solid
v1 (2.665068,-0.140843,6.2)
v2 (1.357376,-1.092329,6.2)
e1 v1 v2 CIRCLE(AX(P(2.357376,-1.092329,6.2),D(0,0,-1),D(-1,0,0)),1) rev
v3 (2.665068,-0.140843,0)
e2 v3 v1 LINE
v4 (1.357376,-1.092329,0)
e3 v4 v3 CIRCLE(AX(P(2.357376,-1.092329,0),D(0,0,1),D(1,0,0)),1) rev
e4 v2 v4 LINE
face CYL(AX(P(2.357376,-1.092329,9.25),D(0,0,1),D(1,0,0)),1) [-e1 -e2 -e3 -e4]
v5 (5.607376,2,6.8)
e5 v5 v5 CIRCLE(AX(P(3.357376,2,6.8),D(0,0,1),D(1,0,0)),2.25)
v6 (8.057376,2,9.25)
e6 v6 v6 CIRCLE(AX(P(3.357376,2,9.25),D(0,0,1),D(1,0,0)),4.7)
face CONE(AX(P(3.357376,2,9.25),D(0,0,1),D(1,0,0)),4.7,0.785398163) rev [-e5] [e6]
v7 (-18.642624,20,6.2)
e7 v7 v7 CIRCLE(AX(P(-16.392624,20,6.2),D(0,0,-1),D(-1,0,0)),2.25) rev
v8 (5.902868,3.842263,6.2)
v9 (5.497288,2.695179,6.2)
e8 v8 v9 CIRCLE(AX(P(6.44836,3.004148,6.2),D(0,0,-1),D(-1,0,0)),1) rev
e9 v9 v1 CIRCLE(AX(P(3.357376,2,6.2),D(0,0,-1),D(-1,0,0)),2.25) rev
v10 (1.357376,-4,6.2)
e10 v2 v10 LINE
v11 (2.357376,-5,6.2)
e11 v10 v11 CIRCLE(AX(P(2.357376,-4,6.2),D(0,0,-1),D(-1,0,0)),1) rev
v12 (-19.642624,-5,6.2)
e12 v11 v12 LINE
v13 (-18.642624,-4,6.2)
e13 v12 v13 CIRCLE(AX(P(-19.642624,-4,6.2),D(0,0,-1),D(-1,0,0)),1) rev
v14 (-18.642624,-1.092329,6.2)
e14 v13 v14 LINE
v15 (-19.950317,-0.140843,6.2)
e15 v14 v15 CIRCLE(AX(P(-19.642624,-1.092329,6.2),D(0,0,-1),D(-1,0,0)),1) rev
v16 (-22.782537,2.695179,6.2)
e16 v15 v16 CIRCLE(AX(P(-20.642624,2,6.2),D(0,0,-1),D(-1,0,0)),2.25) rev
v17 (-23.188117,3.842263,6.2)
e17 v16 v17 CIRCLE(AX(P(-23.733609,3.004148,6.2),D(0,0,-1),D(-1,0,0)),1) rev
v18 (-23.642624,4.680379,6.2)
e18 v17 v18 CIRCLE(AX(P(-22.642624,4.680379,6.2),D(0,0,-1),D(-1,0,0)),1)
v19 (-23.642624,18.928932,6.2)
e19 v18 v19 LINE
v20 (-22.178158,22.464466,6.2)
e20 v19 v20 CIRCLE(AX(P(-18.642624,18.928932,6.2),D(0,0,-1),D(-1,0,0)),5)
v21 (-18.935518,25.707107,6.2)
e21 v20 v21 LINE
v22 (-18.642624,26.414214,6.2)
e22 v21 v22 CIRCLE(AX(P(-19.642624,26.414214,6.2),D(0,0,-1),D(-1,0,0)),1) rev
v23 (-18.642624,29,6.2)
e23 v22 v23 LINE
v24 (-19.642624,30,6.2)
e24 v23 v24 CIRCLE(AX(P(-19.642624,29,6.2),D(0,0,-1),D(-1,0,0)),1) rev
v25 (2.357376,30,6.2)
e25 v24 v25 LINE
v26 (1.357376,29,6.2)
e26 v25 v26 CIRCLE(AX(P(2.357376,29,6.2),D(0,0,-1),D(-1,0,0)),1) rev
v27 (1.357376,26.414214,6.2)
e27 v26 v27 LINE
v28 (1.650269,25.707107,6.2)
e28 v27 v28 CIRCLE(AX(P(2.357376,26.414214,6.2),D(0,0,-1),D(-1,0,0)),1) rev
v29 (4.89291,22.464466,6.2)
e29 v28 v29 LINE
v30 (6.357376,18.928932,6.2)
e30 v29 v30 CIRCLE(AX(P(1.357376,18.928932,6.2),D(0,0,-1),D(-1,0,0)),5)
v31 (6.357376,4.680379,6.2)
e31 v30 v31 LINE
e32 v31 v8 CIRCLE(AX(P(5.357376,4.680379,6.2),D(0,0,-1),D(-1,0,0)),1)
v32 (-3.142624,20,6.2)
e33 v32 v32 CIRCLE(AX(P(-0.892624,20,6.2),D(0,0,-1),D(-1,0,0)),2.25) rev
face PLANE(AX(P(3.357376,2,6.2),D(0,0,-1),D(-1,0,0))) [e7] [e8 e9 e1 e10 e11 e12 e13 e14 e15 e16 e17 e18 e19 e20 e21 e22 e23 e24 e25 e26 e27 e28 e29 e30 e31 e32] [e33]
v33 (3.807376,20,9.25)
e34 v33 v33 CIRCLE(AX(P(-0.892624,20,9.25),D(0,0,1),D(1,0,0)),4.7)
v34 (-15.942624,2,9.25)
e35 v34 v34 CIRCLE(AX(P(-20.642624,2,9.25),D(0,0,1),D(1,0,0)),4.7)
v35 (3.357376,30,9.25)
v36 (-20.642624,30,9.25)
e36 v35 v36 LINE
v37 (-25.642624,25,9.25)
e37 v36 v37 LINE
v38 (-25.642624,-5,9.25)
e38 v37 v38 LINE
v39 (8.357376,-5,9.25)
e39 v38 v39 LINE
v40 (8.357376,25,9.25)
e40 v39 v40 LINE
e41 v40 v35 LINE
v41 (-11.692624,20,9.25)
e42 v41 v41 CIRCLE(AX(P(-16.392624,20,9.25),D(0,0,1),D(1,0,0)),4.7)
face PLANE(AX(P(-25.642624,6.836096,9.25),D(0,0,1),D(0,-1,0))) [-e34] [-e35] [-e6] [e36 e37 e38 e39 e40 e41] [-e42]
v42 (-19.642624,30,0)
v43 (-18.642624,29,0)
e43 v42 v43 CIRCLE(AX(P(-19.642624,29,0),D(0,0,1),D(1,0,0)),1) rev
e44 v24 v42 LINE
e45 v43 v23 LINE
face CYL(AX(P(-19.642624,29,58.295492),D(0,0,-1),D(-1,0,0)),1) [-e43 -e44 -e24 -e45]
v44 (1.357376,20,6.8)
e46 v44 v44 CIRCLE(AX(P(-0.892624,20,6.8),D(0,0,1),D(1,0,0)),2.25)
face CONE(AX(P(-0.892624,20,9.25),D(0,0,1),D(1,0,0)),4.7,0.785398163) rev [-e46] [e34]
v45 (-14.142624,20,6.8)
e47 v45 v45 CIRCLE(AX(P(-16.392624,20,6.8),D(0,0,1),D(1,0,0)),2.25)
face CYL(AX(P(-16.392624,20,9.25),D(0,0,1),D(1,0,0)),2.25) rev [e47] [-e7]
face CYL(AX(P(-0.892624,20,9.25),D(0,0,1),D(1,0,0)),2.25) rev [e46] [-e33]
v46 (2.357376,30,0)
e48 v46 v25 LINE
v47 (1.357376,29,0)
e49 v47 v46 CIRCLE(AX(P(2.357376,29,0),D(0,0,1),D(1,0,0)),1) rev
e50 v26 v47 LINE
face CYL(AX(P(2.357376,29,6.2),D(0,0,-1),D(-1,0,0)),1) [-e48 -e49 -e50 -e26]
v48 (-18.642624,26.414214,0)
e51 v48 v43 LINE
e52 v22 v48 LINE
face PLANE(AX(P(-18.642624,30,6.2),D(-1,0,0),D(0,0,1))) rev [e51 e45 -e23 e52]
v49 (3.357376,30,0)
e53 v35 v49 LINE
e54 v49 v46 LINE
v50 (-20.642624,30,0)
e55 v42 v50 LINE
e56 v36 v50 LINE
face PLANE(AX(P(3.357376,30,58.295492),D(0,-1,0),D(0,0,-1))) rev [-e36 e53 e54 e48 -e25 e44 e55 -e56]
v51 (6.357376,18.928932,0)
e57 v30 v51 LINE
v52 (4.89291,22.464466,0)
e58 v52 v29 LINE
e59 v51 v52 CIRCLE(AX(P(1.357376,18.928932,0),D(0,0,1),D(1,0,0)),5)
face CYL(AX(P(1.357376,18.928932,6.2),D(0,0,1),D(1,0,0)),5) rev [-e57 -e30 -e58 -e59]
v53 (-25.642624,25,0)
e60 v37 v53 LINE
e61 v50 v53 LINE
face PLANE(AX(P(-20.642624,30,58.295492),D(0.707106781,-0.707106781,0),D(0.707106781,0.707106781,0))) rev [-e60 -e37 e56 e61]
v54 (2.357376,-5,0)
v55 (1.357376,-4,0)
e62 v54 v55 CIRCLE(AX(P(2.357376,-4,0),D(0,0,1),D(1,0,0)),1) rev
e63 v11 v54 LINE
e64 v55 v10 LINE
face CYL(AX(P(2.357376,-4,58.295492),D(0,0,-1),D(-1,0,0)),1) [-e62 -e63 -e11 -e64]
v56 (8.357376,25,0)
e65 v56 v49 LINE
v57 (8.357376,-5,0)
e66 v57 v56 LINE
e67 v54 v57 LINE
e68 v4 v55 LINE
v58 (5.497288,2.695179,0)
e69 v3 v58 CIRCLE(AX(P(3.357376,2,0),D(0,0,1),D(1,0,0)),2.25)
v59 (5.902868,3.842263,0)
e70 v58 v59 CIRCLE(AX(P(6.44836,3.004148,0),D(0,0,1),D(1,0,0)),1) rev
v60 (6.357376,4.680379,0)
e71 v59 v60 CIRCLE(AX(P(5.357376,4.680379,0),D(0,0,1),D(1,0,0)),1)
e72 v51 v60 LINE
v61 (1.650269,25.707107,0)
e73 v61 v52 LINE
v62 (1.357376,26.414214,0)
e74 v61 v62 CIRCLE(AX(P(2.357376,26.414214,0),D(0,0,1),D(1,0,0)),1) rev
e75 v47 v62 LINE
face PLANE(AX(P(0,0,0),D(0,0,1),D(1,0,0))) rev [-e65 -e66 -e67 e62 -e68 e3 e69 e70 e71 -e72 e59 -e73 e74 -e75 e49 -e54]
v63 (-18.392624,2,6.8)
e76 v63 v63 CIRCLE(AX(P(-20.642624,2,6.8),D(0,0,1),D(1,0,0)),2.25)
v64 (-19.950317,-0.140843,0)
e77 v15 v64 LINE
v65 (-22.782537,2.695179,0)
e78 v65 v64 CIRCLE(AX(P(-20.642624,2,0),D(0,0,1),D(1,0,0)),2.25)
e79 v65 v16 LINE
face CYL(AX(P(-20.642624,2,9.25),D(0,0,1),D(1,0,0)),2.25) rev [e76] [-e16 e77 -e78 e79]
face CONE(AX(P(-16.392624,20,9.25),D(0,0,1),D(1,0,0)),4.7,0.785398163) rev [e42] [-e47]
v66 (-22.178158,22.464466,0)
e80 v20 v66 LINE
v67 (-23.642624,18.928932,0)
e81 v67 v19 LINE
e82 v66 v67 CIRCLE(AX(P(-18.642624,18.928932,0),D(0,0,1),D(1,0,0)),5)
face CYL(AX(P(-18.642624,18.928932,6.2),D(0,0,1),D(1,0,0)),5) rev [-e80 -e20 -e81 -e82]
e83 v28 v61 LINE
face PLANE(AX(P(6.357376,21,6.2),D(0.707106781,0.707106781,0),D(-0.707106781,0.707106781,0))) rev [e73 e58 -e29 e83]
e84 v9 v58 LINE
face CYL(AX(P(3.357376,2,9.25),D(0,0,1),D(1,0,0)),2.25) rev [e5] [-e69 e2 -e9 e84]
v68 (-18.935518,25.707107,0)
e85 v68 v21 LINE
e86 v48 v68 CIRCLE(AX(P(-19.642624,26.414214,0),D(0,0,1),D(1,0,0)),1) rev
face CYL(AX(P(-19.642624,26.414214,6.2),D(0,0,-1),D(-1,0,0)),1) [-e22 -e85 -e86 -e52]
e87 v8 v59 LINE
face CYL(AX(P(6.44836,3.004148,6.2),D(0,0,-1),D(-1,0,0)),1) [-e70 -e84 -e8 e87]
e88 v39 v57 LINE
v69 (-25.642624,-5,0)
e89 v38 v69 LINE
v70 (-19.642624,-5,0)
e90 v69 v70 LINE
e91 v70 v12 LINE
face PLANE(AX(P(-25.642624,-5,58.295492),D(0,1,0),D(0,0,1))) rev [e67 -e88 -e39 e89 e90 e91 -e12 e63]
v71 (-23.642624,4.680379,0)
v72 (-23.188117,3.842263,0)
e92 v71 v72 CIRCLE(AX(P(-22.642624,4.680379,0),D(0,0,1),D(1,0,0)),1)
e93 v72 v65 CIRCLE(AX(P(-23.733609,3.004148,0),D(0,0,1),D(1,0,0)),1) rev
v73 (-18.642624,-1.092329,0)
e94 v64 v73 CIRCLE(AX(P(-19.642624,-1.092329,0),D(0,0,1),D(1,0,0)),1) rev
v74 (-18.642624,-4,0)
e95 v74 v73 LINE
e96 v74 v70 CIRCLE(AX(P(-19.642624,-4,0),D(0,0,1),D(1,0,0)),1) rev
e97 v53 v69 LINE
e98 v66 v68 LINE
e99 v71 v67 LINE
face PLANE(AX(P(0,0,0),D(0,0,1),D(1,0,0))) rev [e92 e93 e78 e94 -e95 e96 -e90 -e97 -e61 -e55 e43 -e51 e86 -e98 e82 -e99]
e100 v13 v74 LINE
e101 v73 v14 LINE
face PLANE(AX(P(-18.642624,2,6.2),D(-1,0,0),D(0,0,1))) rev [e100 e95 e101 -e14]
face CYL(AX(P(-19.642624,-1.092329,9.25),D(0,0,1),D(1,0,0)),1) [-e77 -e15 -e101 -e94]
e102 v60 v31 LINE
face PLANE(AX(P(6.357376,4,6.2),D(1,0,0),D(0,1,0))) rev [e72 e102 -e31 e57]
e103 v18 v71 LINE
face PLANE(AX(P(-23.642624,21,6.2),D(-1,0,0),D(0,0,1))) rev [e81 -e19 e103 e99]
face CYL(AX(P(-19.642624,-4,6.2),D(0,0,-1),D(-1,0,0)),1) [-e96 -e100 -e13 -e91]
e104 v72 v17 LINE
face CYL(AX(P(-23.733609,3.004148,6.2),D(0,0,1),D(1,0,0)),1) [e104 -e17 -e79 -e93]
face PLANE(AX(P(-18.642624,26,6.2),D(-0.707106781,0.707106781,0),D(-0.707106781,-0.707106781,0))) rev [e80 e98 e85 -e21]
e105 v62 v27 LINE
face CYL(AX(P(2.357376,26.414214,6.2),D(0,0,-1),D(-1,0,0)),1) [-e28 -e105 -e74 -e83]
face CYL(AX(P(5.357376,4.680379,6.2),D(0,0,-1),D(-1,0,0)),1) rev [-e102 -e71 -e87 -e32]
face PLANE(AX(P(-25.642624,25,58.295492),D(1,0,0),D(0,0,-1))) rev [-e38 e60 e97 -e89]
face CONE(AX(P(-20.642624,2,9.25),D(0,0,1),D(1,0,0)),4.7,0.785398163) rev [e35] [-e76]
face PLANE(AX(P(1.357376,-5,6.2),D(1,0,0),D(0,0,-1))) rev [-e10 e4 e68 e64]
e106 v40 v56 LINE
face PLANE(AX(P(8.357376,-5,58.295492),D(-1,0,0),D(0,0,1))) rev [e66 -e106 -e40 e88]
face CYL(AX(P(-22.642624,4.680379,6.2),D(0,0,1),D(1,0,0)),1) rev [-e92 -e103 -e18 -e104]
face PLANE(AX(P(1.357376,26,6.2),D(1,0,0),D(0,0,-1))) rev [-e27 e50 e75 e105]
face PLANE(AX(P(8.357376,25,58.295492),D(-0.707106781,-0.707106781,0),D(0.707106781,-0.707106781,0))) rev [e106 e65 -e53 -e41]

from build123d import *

# Parameters (mm, degrees)
EXTRUDE1_DEPTH                                       = 9.25
CSK_FOR_M4_COUNTERSUNK_RAISED_HEAD_SCREW_D           = 4.5
CSK_FOR_M4_COUNTERSUNK_RAISED_HEAD_SCREW_CSINK_D     = 9.4
CSK_FOR_M4_COUNTERSUNK_RAISED_HEAD_SCREW_CSINK_ANGLE = 90
EXTRUDE2_DEPTH                                       = 6.2
FILLET1_R                                            = 1
FILLET2_R                                            = 1
FILLET3_R                                            = 5


with BuildPart() as part:
    # Sketch1 → Extrude1 (new body)
    with BuildSketch(Plane.XY):
        Polygon((3.357375606748374, 30), (-20.6426243932516, 30), (-25.642624393251616, 25.000000000000007), (-25.642624393251616, -4.999999999999999), (8.357375606748393, -4.999999999999999), (8.357375606748393, 25), align=None)
    extrude(amount=EXTRUDE1_DEPTH)

    # CSK for M4 Countersunk Raised Head Screw1 (through all)
    with Locations(Plane.XY.offset(9.249999999999995)):
        with Locations((-0.892624393, 20), (-16.392624393, 20), (-20.642624393, 2), (3.357375607, 2)):
            CounterSinkHole(CSK_FOR_M4_COUNTERSUNK_RAISED_HEAD_SCREW_D / 2, CSK_FOR_M4_COUNTERSUNK_RAISED_HEAD_SCREW_CSINK_D / 2, counter_sink_angle=CSK_FOR_M4_COUNTERSUNK_RAISED_HEAD_SCREW_CSINK_ANGLE)

    # Sketch6 → Extrude2 (cut)
    with BuildSketch(Plane(origin=(0, 0, 0), x_dir=(-1, 0, 0), z_dir=(0, 0, -1))):
        with BuildLine():
            Line((-1.357375606748385, -4.999999999999999), (-1.357375606748385, 1.9999999999999944))
            ThreePointArc((-1.357375606748385, 1.9999999999999944), (-1.9431620443752904, 3.4142135623730905), (-3.357375606748387, 3.9999999999999947))
            Line((-3.357375606748387, 3.9999999999999947), (-6.357375606748384, 3.9999999999999947))
            Line((-6.357375606748384, 3.9999999999999947), (-6.357375606748382, 20.999999999999996))
            Line((-6.357375606748382, 20.999999999999996), (-1.3573756067483855, 25.999999999999996))
            Line((-1.3573756067483855, 25.999999999999996), (-1.3573756067483855, 30))
            Line((-1.3573756067483855, 30), (18.642624393251616, 30))
            Line((18.642624393251616, 30), (18.642624393251616, 25.999999999999996))
            Line((18.642624393251616, 25.999999999999996), (23.642624393251612, 20.999999999999996))
            Line((23.642624393251612, 20.999999999999996), (23.642624393251612, 3.9999999999999947))
            Line((23.642624393251612, 3.9999999999999947), (20.642624393251616, 3.9999999999999947))
            ThreePointArc((20.642624393251616, 3.9999999999999947), (19.22841083087852, 3.4142135623730896), (18.642624393251616, 1.9999999999999944))
            Line((18.642624393251616, 1.9999999999999944), (18.642624393251616, -4.999999999999999))
            Line((18.642624393251616, -4.999999999999999), (-1.357375606748385, -4.999999999999999))
        make_face()
    extrude(amount=-EXTRUDE2_DEPTH, mode=Mode.SUBTRACT)

    # Fillet1
    # the kernel refuses this fillet: 1 mm, written as the material it takes off along each edge
    with BuildSketch(Plane(origin=(1.3573756067483842, -4.999999999999999, -2.5000000000000004), x_dir=(1, 0, 0), z_dir=(0, 0, 1))) as fillet1_piece_1:
        with BuildLine():
            CenterArc((FILLET1_R, FILLET1_R), FILLET1_R, 180, 90)
            Line((0, FILLET1_R), (0, 0))
            Line((0, 0), (FILLET1_R, 0))
        make_face()
    extrude(amount=8.700000000000001, mode=Mode.SUBTRACT)
    with BuildSketch(Plane(origin=(-18.642624393251616, -4.999999999999999, -2.5000000000000004), x_dir=(-1, 0, 0), z_dir=(0, 0, 1))) as fillet1_piece_2:
        with BuildLine():
            CenterArc((FILLET1_R, -FILLET1_R), FILLET1_R, 90, 90)
            Line((0, -FILLET1_R), (0, 0))
            Line((0, 0), (FILLET1_R, 0))
        make_face()
    extrude(amount=8.700000000000001, mode=Mode.SUBTRACT)
    with BuildSketch(Plane(origin=(-18.642624393251616, 30, -2.5000000000000004), x_dir=(-1, 0, 0), z_dir=(0, 0, 1))) as fillet1_piece_3:
        with BuildLine():
            CenterArc((FILLET1_R, FILLET1_R), FILLET1_R, 180, 90)
            Line((0, FILLET1_R), (0, 0))
            Line((0, 0), (FILLET1_R, 0))
        make_face()
    extrude(amount=8.700000000000001, mode=Mode.SUBTRACT)
    with BuildSketch(Plane(origin=(1.3573756067483855, 30, -2.5000000000000004), x_dir=(1, 0, 0), z_dir=(0, 0, 1))) as fillet1_piece_4:
        with BuildLine():
            CenterArc((FILLET1_R, -FILLET1_R), FILLET1_R, 90, 90)
            Line((0, -FILLET1_R), (0, 0))
            Line((0, 0), (FILLET1_R, 0))
        make_face()
    extrude(amount=8.700000000000001, mode=Mode.SUBTRACT)
    with BuildSketch(Plane(origin=(1.3573756067483855, 25.999999999999996, -1.0355339059327398), x_dir=(0, 1, 0), z_dir=(0, 0, 1))) as fillet1_piece_5:
        with BuildLine():
            CenterArc((FILLET1_R * 0.414213562373, -FILLET1_R), FILLET1_R, 90, 44.999999999999886)
            Line((-FILLET1_R * 0.292893218813, -FILLET1_R * 0.292893218813), (0, 0))
            Line((0, 0), (FILLET1_R * 0.414213562373, 0))
        make_face()
    extrude(amount=7.23553390593274, mode=Mode.SUBTRACT)
    with BuildSketch(Plane(origin=(-18.642624393251616, 25.999999999999996, -1.0355339059327398), x_dir=(0, 1, 0), z_dir=(0, 0, 1))) as fillet1_piece_6:
        with BuildLine():
            CenterArc((FILLET1_R * 0.414213562373, FILLET1_R), FILLET1_R, 225.0000000000001, 44.999999999999886)
            Line((-FILLET1_R * 0.292893218813, FILLET1_R * 0.292893218813), (0, 0))
            Line((0, 0), (FILLET1_R * 0.414213562373, 0))
        make_face()
    extrude(amount=7.23553390593274, mode=Mode.SUBTRACT)
    with BuildSketch(Plane(origin=(4.388152013404426, 3.9999999999999947, 6.2), x_dir=(0.6476614705960325, -0.7619282246415239, 0), z_dir=(0, 0, -1))) as fillet1_piece_7:
        with BuildLine():
            CenterArc((2.093085588135569, -0.924755812678291), FILLET1_R, 112.36843760662408, 102.77681294898315)
            Line((1.275390248397613, -1.5004070363987214), (0, 0))
            ThreePointArc((0, 0), (0.8562622860554598, -0.1692994214738442), (1.71252457211092, -2e-17))
        make_face()
    extrude(amount=11.123058983359915, mode=Mode.SUBTRACT)
    with BuildSketch(Plane(origin=(1.357375606748385, 0.9692235940837892, 6.2), x_dir=(0, -1, 0), z_dir=(0, 0, -1))) as fillet1_piece_8:
        with BuildLine():
            CenterArc((2.0615528132156675, -1), FILLET1_R, 90, 107.92021314405432)
            ThreePointArc((1.110066899636628, -1.3076923077697278), (0.6845392185374297, -0.5439119848812466), (0, 0))
            Line((0, 0), (2.0615528132156675, 0))
        make_face()
    extrude(amount=11.35388203303917, mode=Mode.SUBTRACT)
    with BuildSketch(Plane(origin=(-18.642624393251616, 0.9692235931073754, 6.2), x_dir=(0, -1, 0), z_dir=(0, 0, -1))) as fillet1_piece_9:
        with BuildLine():
            CenterArc((2.061552812401989, 1), FILLET1_R, 162.07978686526982, 107.92021313473018)
            ThreePointArc((1.1100668987728768, 1.3076923076148859), (0.6845392180349299, 0.543911984936301), (0, 0))
            Line((0, 0), (2.061552812401989, 0))
        make_face()
    extrude(amount=11.353882031004975, mode=Mode.SUBTRACT)
    with BuildSketch(Plane(origin=(-21.673400799404423, 3.9999999999999947, 6.2), x_dir=(-0.6476614705905301, -0.7619282246462011, 0), z_dir=(0, 0, -1))) as fillet1_piece_10:
        with BuildLine():
            CenterArc((2.0930855881723076, 0.9247558126755415), FILLET1_R, 144.8547494166881, 102.77681297627396)
            Line((1.2753902487127007, 1.5004070367913585), (0, 0))
            ThreePointArc((0, 0), (0.8562622860704877, 0.16929942148002802), (1.7125245721409794, -5e-17))
        make_face()
    extrude(amount=11.123058984617991, mode=Mode.SUBTRACT)

    # Fillet2
    fillet2_edges = [part.edges().sort_by_distance(p)[0] for p in [
        (-23.642624393251612, 3.9999999999999947, 3.1),
        (6.357375606748384, 3.9999999999999947, 3.1),
    ]]
    fillet(fillet2_edges, radius=FILLET2_R)

    # Fillet3
    fillet3_edges = [part.edges().sort_by_distance(p)[0] for p in [
        (6.357375606748382, 20.999999999999996, 3.1),
        (-23.642624393251612, 20.999999999999996, 3.1),
    ]]
    fillet(fillet3_edges, radius=FILLET3_R)


solid = part.part
